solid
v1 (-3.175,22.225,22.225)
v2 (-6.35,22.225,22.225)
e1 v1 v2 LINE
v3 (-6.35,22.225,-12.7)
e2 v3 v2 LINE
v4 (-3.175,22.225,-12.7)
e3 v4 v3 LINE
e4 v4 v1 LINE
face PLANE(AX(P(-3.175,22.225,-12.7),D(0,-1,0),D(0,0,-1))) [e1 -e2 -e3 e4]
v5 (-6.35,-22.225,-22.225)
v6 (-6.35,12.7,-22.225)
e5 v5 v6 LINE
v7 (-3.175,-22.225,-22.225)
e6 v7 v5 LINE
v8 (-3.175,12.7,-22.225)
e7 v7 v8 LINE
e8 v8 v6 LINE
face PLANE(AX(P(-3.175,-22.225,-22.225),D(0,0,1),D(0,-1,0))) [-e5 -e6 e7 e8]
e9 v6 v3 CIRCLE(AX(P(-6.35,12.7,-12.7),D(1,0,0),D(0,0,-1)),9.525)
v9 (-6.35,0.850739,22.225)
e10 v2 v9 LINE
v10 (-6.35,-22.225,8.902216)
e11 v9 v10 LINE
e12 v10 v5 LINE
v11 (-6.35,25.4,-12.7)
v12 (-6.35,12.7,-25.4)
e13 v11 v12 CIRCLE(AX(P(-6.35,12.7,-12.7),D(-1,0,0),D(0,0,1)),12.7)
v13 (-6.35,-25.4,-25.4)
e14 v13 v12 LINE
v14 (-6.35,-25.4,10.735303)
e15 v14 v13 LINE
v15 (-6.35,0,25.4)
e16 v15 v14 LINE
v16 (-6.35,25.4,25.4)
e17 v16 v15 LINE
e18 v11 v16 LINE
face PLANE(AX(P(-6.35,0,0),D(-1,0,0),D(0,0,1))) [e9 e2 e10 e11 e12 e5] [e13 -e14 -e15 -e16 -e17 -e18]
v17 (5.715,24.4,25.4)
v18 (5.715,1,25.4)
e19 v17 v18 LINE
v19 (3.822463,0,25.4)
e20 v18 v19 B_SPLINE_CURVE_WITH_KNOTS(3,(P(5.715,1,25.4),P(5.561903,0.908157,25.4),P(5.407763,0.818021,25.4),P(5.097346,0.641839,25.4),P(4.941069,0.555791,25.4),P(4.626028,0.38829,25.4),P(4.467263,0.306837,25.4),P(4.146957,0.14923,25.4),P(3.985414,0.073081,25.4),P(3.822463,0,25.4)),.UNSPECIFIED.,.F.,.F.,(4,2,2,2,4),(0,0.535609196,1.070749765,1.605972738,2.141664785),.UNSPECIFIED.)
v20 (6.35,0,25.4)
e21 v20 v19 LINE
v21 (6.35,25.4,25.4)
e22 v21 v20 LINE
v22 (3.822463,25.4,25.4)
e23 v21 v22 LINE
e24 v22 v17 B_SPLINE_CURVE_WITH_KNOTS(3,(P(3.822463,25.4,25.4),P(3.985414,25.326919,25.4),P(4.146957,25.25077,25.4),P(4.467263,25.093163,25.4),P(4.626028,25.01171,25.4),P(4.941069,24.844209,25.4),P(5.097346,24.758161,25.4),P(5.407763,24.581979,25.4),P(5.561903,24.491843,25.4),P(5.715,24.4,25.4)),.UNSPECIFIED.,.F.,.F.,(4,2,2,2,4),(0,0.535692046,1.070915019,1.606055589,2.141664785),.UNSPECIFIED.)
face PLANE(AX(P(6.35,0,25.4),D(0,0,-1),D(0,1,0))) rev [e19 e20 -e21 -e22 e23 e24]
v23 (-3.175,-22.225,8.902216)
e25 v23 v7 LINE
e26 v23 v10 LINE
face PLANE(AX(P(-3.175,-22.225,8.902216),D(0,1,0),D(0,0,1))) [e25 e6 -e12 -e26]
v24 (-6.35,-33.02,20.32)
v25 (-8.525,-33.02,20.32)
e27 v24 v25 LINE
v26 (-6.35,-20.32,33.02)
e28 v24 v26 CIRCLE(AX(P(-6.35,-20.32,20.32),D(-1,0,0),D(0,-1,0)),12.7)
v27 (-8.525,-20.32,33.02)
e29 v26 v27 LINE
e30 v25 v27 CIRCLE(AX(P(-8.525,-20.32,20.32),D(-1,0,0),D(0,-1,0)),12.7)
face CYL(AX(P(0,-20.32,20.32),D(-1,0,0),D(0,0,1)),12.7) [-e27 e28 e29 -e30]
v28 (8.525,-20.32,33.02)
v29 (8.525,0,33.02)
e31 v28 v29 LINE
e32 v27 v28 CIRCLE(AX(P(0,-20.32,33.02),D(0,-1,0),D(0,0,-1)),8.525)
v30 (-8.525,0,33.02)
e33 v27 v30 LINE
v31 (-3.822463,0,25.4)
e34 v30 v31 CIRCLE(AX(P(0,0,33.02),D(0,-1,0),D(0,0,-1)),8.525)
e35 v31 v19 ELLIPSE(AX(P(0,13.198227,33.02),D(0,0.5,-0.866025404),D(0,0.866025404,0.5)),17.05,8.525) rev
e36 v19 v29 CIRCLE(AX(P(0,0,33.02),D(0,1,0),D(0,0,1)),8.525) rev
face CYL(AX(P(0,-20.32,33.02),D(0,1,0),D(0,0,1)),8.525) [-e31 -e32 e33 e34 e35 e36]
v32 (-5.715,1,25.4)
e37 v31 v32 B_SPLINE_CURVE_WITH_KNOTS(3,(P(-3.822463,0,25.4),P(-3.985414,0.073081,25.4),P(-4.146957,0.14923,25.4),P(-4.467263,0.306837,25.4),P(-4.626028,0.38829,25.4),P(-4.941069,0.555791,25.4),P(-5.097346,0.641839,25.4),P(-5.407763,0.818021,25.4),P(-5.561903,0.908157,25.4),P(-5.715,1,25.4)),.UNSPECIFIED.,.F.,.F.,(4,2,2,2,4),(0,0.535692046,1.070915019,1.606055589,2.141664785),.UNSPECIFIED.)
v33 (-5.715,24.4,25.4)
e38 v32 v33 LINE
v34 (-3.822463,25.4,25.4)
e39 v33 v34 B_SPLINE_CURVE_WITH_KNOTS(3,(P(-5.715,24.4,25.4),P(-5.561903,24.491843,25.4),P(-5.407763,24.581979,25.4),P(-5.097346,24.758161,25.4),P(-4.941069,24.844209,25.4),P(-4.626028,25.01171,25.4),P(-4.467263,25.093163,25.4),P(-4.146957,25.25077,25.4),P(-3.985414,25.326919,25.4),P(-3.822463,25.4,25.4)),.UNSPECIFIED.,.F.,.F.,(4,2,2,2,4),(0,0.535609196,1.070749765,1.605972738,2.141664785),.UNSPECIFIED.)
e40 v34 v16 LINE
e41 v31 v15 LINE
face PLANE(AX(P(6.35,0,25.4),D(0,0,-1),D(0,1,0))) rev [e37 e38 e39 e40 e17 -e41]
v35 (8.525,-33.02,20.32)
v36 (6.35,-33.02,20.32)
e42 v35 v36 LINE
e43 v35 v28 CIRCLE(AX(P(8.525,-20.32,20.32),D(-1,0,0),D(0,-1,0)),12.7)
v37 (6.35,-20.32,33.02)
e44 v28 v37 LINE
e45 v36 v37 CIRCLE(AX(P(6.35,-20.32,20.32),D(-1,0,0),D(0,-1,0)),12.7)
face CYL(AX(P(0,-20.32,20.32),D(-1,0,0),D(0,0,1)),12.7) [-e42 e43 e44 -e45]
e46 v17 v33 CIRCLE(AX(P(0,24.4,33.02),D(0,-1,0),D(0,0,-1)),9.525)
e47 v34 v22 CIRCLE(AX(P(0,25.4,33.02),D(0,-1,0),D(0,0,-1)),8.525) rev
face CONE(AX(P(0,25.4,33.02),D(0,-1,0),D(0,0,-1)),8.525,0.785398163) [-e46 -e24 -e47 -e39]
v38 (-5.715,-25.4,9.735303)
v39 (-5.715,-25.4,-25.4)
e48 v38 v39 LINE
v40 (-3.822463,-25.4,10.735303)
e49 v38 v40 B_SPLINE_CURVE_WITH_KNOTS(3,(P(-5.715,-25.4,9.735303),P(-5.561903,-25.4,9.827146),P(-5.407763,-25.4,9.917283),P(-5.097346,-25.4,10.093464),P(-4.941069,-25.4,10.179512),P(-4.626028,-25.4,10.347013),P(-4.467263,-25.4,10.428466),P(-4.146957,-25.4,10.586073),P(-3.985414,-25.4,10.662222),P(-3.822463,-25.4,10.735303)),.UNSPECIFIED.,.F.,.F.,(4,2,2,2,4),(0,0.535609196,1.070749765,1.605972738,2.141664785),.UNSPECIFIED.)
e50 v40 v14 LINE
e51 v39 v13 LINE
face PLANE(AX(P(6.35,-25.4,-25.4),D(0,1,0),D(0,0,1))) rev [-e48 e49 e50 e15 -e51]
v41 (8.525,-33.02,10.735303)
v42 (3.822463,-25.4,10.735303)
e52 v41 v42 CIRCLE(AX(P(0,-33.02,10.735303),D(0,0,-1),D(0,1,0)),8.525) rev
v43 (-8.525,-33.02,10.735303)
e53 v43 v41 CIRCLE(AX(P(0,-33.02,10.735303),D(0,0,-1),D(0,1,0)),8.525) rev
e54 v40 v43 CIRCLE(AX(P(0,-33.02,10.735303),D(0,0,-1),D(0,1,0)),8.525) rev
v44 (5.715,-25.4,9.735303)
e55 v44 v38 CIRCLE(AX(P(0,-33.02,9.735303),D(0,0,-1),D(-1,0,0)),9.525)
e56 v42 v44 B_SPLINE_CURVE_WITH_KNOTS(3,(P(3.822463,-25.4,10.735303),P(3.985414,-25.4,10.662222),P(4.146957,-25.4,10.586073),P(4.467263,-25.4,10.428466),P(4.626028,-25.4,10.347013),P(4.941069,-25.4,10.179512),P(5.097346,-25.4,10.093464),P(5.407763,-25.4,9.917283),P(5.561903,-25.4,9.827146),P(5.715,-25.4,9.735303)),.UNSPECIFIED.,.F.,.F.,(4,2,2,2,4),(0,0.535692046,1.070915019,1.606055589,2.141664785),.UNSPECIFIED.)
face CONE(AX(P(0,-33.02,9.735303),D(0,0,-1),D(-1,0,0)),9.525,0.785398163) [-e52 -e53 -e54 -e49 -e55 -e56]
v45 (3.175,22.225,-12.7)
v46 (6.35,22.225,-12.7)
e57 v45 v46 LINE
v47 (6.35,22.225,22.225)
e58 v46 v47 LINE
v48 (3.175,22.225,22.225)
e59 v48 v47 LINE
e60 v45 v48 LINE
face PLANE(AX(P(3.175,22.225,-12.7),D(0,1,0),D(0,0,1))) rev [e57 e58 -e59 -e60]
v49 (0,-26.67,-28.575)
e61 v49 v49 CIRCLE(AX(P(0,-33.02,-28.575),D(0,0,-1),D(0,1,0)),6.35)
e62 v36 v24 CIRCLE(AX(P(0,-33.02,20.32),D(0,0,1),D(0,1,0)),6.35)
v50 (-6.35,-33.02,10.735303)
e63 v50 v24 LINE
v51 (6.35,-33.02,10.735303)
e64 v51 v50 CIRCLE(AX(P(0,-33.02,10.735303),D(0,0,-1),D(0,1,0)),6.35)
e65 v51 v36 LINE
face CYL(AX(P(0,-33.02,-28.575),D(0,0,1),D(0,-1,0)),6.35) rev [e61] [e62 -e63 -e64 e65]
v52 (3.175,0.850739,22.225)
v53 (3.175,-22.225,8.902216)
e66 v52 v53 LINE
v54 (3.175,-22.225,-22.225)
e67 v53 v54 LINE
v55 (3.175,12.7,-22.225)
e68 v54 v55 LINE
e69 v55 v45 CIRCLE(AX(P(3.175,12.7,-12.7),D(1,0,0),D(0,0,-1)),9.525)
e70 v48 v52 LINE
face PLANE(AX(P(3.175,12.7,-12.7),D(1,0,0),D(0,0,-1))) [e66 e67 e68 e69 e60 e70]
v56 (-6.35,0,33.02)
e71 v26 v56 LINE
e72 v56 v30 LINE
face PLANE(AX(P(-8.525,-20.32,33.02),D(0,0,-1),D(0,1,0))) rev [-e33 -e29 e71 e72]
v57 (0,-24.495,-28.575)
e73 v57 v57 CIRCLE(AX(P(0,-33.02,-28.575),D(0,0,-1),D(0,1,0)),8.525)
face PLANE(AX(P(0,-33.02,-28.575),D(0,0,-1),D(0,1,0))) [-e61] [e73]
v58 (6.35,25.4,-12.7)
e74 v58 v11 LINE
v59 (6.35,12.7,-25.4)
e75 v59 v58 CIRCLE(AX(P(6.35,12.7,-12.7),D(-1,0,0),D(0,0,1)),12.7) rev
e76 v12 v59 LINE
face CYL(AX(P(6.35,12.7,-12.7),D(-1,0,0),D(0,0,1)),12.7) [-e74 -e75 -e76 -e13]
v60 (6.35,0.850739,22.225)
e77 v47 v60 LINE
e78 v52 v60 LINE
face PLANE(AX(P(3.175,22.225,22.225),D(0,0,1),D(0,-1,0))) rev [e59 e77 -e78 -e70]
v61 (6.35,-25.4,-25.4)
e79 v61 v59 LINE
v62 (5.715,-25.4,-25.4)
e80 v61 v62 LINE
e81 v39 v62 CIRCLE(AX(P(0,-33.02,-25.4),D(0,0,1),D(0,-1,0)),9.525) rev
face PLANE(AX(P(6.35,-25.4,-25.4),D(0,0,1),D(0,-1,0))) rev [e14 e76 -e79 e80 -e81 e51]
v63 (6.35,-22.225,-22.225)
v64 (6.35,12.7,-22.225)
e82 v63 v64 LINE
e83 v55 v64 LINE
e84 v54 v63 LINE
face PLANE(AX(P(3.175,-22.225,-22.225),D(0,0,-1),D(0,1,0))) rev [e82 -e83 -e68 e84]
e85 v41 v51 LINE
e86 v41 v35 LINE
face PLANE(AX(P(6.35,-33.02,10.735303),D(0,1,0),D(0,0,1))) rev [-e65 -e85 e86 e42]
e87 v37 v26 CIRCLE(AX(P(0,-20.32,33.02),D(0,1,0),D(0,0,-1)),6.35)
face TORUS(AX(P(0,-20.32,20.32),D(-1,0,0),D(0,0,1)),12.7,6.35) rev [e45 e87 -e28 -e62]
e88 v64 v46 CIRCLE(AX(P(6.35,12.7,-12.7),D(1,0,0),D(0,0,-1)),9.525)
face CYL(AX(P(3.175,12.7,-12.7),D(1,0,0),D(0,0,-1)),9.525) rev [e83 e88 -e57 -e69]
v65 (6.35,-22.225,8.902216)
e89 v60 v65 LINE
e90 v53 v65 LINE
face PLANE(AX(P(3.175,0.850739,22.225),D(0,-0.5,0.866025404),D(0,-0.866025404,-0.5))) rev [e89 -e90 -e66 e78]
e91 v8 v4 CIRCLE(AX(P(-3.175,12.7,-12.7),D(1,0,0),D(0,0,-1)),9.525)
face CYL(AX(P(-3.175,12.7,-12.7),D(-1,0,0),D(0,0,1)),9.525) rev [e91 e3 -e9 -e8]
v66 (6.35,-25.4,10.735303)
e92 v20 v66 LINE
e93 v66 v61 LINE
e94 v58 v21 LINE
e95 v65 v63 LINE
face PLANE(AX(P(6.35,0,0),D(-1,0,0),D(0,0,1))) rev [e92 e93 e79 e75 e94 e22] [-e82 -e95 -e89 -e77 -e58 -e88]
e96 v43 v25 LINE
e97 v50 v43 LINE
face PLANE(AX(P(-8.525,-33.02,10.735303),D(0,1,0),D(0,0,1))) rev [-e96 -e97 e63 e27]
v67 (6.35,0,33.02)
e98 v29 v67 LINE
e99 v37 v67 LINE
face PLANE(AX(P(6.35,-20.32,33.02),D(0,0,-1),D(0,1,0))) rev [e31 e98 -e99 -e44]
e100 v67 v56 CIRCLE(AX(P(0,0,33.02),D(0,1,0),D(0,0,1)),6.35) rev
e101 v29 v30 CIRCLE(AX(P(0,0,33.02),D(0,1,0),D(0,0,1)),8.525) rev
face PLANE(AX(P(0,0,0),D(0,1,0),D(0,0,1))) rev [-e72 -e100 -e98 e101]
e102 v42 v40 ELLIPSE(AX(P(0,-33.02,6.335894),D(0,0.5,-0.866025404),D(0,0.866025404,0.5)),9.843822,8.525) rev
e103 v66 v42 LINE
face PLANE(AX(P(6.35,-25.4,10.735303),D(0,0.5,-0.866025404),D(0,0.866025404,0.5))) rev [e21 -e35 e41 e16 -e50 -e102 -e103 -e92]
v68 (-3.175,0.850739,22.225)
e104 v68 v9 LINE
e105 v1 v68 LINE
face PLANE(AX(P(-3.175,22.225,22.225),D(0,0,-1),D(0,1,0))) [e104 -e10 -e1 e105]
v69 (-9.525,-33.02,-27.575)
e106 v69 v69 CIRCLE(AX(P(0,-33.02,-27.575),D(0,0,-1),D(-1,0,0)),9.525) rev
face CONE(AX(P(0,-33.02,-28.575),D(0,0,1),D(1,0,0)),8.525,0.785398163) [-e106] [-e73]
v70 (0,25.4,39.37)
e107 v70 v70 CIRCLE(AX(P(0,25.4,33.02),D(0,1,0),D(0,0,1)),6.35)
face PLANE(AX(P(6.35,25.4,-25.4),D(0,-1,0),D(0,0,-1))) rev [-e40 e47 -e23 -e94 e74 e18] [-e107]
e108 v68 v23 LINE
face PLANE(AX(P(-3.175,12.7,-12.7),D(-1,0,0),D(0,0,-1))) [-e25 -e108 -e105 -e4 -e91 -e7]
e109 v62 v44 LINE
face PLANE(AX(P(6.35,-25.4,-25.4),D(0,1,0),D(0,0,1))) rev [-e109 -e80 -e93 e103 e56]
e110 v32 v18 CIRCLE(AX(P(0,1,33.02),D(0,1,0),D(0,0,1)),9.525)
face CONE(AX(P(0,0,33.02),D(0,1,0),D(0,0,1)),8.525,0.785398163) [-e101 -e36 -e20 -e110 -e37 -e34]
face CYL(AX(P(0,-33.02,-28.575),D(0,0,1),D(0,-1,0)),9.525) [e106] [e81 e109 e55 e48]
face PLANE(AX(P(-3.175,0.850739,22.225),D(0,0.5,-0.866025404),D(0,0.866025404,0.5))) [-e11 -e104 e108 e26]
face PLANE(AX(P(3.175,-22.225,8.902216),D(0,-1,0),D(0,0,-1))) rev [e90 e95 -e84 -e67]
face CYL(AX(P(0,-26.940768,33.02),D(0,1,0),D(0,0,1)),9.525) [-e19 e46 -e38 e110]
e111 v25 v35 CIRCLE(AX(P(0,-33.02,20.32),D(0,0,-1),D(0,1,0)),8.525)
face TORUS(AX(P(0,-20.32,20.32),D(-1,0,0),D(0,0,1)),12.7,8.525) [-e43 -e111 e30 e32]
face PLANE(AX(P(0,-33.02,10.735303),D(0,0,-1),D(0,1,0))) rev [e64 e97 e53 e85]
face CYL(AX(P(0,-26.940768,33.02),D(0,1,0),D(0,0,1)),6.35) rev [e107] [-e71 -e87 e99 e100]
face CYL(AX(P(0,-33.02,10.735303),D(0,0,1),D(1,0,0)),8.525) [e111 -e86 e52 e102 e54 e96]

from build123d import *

# Parameters (mm, degrees)
BOSS_EXTRUDE1_DEPTH      = 6.35
FILLET1_R                = 12.7
CUT_EXTRUDE2_DEPTH       = 3.175
BOSS_EXTRUDE2_DEPTH      = 3.175
BOSS_EXTRUDE2_DEPTH_BACK = 36.135303
SKETCH4_R                = 9.525
SKETCH4_R_2              = 6.35
SKETCH5_R                = 9.525
SKETCH5_R_2              = 6.35
BOSS_EXTRUDE3_DEPTH      = 25.4
CHAMFER2_SIZE            = 1


with BuildPart() as part:
    # Sketch1 → Boss-Extrude1 (new, symmetric)
    with BuildSketch(Plane.YZ):
        Polygon((-25.4, 10.735303163), (0, 25.4), (25.4, 25.4), (25.4, -25.4), (-25.4, -25.4), align=None)
    extrude(amount=BOSS_EXTRUDE1_DEPTH, both=True)

    # Fillet1
    fillet1_edges = [part.edges().sort_by_distance(p)[0] for p in [
        (0, 25.4, -25.4),
    ]]
    fillet(fillet1_edges, radius=FILLET1_R)

    # Sketch3 → Cut-Extrude2 (cut)
    with BuildSketch(Plane.YZ.offset(6.35)):
        with BuildLine():
            Line((-22.225, -22.225), (12.7, -22.225))
            ThreePointArc((12.7, -22.225), (19.435192091, -19.435192091), (22.225, -12.7))
            Line((22.225, -12.7), (22.225, 22.225))
            Line((22.225, 22.225), (0.850738686, 22.225))
            Line((0.850738686, 22.225), (-22.225, 8.902216058))
            Line((-22.225, 8.902216058), (-22.225, -22.225))
        make_face()
    cut_extrude2 = extrude(amount=-CUT_EXTRUDE2_DEPTH, mode=Mode.SUBTRACT)

    # Mirror1: Cut-Extrude2 across plane
    add(cut_extrude2.mirror(Plane(origin=(0, 0, 0), x_dir=(0, 0, 1), z_dir=(1, 0, 0))), mode=Mode.SUBTRACT)

    # Sketch4 → Boss-Extrude2 (add, two sides: drawn at the far end of the back side and taken through both)
    with BuildSketch(Plane(origin=(0, 0, -25.4), x_dir=(1, 0, 0), z_dir=(0, 0, -1)).offset(-BOSS_EXTRUDE2_DEPTH_BACK)):
        with Locations(Location((0, 33.02, 0), (0, 0, 233.130102354))):
            Circle(SKETCH4_R)
        with Locations(Location((0, 33.02, 0), (0, 0, 270))):
            Circle(SKETCH4_R_2, mode=Mode.SUBTRACT)
    extrude(amount=BOSS_EXTRUDE2_DEPTH + BOSS_EXTRUDE2_DEPTH_BACK)

    # Sketch5 → Boss-Extrude3 (add)
    with BuildSketch(Plane(origin=(0, 25.4, 0), x_dir=(-1, 0, 0), z_dir=(0, 1, 0))):
        with Locations((0, 33.02)):
            Circle(SKETCH5_R)
        with Locations(Location((0, 33.02, 0), (0, 0, 90))):
            Circle(SKETCH5_R_2, mode=Mode.SUBTRACT)
    extrude(amount=-BOSS_EXTRUDE3_DEPTH)

    # Chamfer2
    # the kernel refuses this chamfer: 1 mm, written as the material it takes off along each edge
    with BuildSketch(Plane(origin=(0, -33.02, 10.735303), x_dir=(0.3638595085405839, 0.931453841070294, 0), z_dir=(-0.931453841070294, 0.3638595085405839, 0))) as chamfer2_piece_1_section:
        Polygon((9.525, CHAMFER2_SIZE), (9.525 - CHAMFER2_SIZE, 0), (9.525, 0), align=None)
    chamfer2_piece_1 = revolve(axis=Axis((0, -33.02, 10.735303), (0, 0, -1)), revolution_arc=317.325176487, mode=Mode.PRIVATE)
    chamfer2_piece_1 = split(chamfer2_piece_1, bisect_by=Plane(origin=(5.777045626, -25.4, 10.24862198), z_dir=(0, -1, 0)), keep=Keep.TOP, mode=Mode.PRIVATE)
    add(chamfer2_piece_1, mode=Mode.SUBTRACT)
    with BuildSketch(Plane(origin=(0, -33.02, -28.575), x_dir=(-0.6000000000021781, 0.7999999999983665, 0), z_dir=(-0.7999999999983665, -0.6000000000021781, 0))) as chamfer2_piece_2:
        Polygon((9.525, -CHAMFER2_SIZE), (9.525 - CHAMFER2_SIZE, 0), (9.525, 0), align=None)
    revolve(axis=Axis((0, -33.02, -28.575), (0, 0, -1)), mode=Mode.SUBTRACT)
    with BuildSketch(Plane(origin=(0, 25.4, 33.02), x_dir=(-0.3638595085405501, 0, -0.9314538410703074), z_dir=(0.9314538410703074, 0, -0.3638595085405501))) as chamfer2_piece_3_section:
        Polygon((9.525, -CHAMFER2_SIZE), (9.525 - CHAMFER2_SIZE, 0), (9.525, 0), align=None)
    chamfer2_piece_3 = revolve(axis=Axis((0, 25.4, 33.02), (0, 1, 0)), revolution_arc=317.325176487, mode=Mode.PRIVATE)
    chamfer2_piece_3 = split(chamfer2_piece_3, bisect_by=Plane(origin=(0, 24.920234358, 25.4), z_dir=(0, 0, 1)), keep=Keep.TOP, mode=Mode.PRIVATE)
    add(chamfer2_piece_3, mode=Mode.SUBTRACT)
    with BuildSketch(Plane(origin=(0, 0, 33.02), x_dir=(-0.3638595085405531, 0, -0.9314538410703063), z_dir=(0.9314538410703063, 0, -0.3638595085405531))) as chamfer2_piece_4_section:
        Polygon((9.525, CHAMFER2_SIZE), (9.525 - CHAMFER2_SIZE, 0), (9.525, 0), align=None)
    chamfer2_piece_4 = revolve(axis=Axis((0, 0, 33.02), (0, 1, 0)), revolution_arc=317.325176487, mode=Mode.PRIVATE)
    chamfer2_piece_4 = split(chamfer2_piece_4, bisect_by=Plane(origin=(-5.452412952, 0.490850729, 25.4), z_dir=(0, 0, 1)), keep=Keep.TOP, mode=Mode.PRIVATE)
    add(chamfer2_piece_4, mode=Mode.SUBTRACT)

    # Sweep3: sweep along a path in Sketch6
    with BuildLine(Plane.YZ) as sweep3_path:
        Line((0, 33.02), (-20.32, 33.02))
        ThreePointArc((-20.32, 33.02), (-29.300256121, 29.300256121), (-33.02, 20.32))
        Line((-33.02, 20.32), (-33.02, 10.735303163))
    # Sketch7 → Sweep3 (sweep)
    with BuildSketch(Plane.XZ):
        with BuildLine():
            Line((-8.525, 33.02), (-6.35, 33.02))
            ThreePointArc((-6.35, 33.02), (0, 26.67), (6.35, 33.02))
            Line((6.35, 33.02), (8.525, 33.02))
            ThreePointArc((8.525, 33.02), (0, 24.495), (-8.525, 33.02))
        make_face()
    sweep(path=sweep3_path.line)


solid = part.part
